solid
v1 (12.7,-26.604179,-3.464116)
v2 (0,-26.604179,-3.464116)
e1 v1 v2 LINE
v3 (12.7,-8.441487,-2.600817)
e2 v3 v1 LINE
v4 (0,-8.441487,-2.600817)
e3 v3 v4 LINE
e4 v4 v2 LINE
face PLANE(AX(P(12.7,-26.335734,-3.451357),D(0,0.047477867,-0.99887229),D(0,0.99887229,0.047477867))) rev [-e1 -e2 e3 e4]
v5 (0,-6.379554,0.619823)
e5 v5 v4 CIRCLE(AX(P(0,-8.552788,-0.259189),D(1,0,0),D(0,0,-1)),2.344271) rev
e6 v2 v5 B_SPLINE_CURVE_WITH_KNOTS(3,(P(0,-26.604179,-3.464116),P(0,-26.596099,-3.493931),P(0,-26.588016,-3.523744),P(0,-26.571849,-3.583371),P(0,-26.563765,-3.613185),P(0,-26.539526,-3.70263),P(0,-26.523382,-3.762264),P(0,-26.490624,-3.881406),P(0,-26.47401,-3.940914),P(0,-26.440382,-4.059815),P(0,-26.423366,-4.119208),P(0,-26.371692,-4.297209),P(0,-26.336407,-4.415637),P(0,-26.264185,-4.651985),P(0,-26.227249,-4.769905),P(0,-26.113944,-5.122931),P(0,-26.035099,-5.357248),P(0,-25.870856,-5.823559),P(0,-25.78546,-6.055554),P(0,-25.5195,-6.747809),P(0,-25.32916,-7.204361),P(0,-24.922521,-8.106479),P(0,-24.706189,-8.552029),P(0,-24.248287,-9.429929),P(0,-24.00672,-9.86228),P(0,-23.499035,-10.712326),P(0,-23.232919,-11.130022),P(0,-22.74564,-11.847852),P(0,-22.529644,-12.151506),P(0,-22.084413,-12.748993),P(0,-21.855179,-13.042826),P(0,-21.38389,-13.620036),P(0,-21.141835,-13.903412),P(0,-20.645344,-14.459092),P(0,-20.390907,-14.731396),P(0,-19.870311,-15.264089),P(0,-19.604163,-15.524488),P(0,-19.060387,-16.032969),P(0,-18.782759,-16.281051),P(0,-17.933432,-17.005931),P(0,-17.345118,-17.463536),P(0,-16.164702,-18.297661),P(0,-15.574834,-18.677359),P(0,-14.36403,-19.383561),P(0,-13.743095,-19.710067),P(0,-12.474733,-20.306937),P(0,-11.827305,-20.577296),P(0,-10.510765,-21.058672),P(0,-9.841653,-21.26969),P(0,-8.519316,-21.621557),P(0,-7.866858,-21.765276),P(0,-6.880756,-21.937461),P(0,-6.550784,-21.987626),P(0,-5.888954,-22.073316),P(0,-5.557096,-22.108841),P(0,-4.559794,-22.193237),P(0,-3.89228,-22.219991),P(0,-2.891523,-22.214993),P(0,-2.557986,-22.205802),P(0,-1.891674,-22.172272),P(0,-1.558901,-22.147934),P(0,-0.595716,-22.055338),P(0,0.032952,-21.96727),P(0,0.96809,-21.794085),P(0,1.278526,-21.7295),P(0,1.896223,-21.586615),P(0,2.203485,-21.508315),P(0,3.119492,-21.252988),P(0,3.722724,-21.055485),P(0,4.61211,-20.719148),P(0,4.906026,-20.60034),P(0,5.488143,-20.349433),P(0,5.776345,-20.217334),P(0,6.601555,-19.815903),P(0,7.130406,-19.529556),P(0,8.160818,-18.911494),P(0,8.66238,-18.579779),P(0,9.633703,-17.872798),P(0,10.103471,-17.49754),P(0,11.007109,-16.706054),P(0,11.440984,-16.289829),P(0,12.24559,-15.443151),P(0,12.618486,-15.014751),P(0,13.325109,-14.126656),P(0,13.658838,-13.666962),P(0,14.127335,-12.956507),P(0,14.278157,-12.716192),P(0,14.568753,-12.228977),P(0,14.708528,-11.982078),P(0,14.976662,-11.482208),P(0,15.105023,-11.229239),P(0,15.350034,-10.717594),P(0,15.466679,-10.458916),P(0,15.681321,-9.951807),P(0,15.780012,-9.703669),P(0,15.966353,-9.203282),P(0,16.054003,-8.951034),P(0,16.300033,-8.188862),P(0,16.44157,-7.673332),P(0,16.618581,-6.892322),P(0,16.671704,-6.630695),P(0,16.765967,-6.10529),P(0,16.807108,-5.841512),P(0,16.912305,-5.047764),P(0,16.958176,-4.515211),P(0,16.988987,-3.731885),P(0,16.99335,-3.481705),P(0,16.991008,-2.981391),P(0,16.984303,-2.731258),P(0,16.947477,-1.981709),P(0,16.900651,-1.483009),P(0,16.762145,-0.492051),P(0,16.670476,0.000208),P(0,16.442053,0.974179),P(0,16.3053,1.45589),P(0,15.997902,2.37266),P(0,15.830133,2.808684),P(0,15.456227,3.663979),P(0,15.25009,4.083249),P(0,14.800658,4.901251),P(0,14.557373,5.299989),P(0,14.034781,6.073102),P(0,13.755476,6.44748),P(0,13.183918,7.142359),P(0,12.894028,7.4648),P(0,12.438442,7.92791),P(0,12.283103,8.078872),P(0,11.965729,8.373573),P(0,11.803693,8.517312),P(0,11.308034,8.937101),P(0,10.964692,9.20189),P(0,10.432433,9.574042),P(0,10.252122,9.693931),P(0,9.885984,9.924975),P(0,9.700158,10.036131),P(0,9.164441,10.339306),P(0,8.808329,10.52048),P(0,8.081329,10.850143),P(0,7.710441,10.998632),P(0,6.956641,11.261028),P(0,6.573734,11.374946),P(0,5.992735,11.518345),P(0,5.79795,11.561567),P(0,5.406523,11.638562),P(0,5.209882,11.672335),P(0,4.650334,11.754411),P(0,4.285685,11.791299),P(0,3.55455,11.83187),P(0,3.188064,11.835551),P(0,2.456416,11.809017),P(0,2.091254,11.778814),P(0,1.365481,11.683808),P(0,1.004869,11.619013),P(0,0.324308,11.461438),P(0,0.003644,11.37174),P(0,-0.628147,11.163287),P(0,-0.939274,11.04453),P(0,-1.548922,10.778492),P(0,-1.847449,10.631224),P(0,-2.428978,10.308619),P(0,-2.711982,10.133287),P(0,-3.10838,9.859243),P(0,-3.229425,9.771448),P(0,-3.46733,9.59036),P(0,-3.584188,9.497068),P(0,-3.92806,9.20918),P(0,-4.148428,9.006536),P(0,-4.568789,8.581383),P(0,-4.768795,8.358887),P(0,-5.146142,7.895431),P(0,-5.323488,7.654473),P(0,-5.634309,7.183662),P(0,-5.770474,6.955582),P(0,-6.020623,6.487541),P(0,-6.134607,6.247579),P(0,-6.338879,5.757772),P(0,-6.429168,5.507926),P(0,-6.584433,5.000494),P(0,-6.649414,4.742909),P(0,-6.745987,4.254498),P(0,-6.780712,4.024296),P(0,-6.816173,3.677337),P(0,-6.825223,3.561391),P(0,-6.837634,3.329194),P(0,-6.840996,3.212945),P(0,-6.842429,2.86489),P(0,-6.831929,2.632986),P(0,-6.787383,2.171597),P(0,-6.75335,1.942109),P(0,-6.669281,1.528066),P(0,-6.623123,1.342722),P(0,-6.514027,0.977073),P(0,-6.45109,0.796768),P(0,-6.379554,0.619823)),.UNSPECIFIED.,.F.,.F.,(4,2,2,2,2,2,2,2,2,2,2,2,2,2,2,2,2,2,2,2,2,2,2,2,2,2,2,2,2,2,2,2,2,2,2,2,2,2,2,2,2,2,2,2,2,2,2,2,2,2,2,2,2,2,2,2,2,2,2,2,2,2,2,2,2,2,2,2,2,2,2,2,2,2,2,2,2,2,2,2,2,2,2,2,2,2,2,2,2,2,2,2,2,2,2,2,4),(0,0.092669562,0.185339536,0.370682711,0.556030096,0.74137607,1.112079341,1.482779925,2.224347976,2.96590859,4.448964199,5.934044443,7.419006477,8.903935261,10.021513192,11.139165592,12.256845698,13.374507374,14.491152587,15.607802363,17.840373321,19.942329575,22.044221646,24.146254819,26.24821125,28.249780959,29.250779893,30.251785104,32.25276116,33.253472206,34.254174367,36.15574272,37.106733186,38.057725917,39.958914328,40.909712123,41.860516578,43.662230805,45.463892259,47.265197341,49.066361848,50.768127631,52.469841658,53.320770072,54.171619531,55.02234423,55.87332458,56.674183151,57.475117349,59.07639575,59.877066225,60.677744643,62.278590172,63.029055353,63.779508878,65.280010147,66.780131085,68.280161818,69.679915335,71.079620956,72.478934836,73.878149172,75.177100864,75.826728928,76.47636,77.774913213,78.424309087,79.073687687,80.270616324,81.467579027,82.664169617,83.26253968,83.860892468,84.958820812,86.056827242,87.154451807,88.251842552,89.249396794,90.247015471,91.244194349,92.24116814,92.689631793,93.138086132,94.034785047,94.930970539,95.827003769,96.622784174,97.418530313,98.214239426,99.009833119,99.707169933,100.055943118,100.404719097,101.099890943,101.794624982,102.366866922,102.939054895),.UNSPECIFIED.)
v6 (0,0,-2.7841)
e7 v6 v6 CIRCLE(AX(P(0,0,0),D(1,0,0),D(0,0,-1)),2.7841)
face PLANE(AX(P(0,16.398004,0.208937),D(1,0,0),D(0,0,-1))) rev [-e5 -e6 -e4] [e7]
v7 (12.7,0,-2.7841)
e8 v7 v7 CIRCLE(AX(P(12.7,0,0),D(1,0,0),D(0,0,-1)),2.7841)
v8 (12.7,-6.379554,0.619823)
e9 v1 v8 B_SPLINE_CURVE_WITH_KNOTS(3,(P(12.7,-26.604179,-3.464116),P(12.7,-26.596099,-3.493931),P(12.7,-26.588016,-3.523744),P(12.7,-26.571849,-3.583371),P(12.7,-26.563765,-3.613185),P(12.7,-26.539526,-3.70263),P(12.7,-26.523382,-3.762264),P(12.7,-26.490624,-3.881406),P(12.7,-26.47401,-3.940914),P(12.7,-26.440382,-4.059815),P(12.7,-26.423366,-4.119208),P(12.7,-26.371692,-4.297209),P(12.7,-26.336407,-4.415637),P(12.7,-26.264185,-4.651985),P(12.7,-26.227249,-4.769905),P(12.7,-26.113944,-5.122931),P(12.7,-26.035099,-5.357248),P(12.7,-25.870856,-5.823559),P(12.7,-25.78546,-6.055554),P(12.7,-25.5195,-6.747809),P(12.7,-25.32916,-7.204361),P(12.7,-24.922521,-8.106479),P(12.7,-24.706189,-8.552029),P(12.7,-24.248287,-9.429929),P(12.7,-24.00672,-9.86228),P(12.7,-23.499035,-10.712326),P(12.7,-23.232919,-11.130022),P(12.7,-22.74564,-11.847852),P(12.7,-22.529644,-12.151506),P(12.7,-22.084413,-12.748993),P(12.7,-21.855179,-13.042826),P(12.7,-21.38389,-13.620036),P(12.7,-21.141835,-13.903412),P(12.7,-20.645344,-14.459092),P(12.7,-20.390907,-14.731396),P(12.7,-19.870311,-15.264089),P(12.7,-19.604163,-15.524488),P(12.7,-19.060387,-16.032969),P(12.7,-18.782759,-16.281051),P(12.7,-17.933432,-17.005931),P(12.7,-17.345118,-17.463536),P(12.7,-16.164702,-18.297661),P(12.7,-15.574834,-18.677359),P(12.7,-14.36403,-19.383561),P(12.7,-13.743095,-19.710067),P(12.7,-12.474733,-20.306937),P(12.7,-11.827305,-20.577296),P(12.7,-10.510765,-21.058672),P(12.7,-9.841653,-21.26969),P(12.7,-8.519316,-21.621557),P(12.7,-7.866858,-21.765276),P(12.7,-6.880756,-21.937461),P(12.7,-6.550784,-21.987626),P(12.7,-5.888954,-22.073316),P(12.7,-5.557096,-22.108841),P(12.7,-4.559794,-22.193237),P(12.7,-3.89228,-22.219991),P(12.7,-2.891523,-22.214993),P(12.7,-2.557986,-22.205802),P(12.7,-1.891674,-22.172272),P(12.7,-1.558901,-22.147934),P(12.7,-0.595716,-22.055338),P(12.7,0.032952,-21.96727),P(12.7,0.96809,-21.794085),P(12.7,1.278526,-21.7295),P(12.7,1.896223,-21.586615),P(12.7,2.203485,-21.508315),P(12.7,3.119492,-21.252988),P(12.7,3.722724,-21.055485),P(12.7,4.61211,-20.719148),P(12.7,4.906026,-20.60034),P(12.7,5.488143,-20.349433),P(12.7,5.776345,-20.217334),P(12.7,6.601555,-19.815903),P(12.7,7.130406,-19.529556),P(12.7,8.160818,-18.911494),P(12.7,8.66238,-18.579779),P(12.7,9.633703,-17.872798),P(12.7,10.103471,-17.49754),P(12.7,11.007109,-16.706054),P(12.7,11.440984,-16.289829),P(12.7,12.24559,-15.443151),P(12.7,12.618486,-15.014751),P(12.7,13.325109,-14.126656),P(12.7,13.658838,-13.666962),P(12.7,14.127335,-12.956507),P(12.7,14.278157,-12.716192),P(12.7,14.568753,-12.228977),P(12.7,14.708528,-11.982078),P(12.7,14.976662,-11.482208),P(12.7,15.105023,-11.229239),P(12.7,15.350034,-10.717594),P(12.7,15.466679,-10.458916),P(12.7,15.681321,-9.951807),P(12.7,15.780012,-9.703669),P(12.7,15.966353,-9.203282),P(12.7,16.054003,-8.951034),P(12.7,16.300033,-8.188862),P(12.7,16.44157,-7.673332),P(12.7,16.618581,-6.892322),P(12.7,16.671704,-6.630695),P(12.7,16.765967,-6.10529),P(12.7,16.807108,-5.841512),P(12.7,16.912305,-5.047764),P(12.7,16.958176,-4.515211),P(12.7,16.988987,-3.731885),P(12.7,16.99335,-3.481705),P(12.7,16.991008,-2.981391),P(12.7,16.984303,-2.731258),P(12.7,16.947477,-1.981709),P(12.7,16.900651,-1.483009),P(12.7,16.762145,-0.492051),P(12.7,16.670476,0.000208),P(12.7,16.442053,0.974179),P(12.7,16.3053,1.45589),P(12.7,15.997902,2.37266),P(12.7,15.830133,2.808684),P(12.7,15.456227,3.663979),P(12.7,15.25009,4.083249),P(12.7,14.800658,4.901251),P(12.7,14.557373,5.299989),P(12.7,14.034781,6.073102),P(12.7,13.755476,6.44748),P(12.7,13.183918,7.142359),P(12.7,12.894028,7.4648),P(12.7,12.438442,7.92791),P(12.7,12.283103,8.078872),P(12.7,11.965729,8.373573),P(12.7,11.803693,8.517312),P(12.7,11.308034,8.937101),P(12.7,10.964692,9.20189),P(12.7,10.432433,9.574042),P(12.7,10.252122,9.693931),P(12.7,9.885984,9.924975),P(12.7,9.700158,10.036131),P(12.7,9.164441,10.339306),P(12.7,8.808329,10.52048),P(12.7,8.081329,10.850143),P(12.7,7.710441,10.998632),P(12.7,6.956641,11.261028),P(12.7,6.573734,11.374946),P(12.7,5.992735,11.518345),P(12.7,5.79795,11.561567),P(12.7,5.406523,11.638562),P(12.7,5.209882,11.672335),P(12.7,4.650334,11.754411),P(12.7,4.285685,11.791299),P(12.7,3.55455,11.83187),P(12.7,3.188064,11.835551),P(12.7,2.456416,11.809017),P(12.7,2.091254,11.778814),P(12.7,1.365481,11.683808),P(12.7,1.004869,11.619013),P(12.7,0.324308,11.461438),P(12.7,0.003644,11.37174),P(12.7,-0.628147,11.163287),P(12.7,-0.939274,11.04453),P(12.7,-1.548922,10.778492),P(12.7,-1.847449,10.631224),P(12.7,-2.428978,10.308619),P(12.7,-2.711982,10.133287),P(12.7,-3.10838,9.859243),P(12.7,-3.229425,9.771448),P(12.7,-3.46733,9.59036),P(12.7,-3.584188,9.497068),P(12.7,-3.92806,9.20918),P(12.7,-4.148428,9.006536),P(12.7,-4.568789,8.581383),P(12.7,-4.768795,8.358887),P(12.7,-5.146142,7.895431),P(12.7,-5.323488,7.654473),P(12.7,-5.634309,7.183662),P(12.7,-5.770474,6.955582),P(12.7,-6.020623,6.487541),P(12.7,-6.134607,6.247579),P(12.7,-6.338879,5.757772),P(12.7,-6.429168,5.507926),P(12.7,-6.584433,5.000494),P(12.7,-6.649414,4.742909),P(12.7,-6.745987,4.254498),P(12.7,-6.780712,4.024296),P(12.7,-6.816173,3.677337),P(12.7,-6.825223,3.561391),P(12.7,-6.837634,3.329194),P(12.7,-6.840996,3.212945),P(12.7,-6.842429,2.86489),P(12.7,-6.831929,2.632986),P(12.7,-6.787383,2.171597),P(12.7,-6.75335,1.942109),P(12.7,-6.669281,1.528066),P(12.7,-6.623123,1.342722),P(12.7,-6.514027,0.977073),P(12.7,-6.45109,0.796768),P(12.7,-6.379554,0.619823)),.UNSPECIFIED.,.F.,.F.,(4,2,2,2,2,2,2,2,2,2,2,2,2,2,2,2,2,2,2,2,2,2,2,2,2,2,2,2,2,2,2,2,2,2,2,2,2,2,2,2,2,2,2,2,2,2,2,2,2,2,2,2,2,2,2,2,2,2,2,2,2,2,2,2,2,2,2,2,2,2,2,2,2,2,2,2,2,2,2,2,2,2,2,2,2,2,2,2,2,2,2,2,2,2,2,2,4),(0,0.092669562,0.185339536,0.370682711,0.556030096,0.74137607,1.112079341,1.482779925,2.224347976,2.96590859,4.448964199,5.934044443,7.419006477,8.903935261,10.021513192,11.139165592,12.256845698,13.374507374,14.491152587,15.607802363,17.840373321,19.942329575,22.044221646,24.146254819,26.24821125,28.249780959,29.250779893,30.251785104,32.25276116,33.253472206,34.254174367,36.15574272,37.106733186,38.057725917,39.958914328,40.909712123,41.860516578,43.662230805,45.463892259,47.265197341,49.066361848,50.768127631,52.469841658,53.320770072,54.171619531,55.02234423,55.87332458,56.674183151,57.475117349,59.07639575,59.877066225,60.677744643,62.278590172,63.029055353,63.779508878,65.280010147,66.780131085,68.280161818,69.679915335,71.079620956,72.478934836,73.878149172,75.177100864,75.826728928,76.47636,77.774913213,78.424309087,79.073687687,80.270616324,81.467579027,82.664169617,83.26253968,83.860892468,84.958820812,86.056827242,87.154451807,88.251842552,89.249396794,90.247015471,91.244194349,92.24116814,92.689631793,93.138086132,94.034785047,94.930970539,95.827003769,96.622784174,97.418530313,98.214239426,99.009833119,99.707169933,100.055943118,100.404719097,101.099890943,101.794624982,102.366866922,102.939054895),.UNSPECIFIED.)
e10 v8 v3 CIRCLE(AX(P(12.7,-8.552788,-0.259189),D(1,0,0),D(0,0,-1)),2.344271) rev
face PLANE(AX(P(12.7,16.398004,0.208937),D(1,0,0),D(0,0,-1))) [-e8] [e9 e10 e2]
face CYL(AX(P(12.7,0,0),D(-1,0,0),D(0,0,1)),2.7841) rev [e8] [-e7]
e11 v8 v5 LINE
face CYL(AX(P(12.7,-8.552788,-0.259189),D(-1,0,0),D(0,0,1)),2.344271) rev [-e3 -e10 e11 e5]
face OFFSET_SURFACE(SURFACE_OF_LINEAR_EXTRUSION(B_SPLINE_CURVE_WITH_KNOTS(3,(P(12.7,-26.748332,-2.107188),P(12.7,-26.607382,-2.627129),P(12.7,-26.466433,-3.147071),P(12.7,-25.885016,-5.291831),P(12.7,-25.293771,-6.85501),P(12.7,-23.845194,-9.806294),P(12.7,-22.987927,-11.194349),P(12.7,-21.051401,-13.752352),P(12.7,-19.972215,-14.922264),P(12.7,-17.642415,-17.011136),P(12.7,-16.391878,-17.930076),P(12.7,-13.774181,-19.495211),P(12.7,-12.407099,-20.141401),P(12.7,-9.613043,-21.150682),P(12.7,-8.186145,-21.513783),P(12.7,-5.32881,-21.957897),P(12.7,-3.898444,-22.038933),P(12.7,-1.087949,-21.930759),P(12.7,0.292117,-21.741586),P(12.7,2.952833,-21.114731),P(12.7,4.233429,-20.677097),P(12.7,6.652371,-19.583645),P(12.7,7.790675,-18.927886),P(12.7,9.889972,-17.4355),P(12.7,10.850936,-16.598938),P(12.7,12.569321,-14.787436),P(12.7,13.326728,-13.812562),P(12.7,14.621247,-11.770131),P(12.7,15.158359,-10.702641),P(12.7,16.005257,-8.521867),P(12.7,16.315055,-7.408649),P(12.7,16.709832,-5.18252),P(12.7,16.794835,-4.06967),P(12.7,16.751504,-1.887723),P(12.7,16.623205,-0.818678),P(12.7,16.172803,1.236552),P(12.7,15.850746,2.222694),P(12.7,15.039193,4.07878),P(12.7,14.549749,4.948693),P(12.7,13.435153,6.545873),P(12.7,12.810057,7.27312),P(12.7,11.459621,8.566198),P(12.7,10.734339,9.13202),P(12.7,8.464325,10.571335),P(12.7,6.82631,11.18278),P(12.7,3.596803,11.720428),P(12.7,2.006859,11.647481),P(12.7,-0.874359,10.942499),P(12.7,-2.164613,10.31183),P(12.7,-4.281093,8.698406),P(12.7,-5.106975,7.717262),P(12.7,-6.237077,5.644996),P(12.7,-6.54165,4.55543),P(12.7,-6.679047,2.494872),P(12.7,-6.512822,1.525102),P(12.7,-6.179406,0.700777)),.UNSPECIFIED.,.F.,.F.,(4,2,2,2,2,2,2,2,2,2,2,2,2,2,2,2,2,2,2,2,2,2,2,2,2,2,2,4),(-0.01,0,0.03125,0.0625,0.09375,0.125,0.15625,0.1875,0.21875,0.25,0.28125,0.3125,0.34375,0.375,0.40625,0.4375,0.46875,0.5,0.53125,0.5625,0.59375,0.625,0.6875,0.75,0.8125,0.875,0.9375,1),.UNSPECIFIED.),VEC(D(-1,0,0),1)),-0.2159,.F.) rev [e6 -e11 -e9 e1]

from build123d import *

# Parameters (mm, degrees)
SKETCH4_R              = 3
BOSS_EXTRUDE1_DEPTH    = 12.7
MOVE_FACE1_OUTLINE_R   = 3
MOVE_FACE1_OUTLINE_R_2 = 2.7841
MOVE_FACE1_DEPTH       = 12.7


# Read off the part's stored shape, not the designer's step: Move Face1
with BuildPart() as part:
    # Sketch4 → Boss-Extrude1 (new body)
    with BuildSketch(Plane(origin=(0, 0, 0), x_dir=(0, 0, -1), z_dir=(1, 0, 0))):
        with BuildLine():
            Line((3.667013126, -26.3254835), (2.816473307, -8.431236894))
            ThreePointArc((2.816473307, -8.431236894), (1.639602622, -6.396649217), (-0.700777066, -6.179406175))
            add(Edge.make_bspline(
                [(-0.700777066, -6.179406175), (-1.525102008, -6.512822326), (-2.494871997, -6.679047096), (-4.555429578, -6.54165034), (-5.644996058, -6.237076936), (-7.717261628, -5.106975392), (-8.698405735, -4.281093265), (-10.311829803, -2.164612563), (-10.942499326, -0.874358563), (-11.647480976, 2.006859472), (-11.720427957, 3.596803483), (-11.182779689, 6.826310345), (-10.571334953, 8.46432492), (-9.132019695, 10.73433891), (-8.566197708, 11.459621106), (-7.273120414, 12.810057002), (-6.545872807, 13.435152517), (-4.948692799, 14.549748502), (-4.078780417, 15.039192621), (-2.22269385, 15.85074605), (-1.236551533, 16.172803424), (0.818678144, 16.623204755), (1.887722789, 16.751503646), (4.069669804, 16.79483508), (5.182520117, 16.709831654), (7.408648574, 16.315055224), (8.521867273, 16.00525724), (10.70264063, 15.158359498), (11.770130786, 14.621247223), (13.812561896, 13.326727542), (14.787435905, 12.56932106), (16.598938448, 10.850935673), (17.435500393, 9.889971566), (18.927885533, 7.790674993), (19.583645356, 6.652371052), (20.677096627, 4.233429246), (21.114730733, 2.952832896), (21.741586229, 0.292117033), (21.930758945, -1.087949282), (22.038932986, -3.898444365), (21.957896657, -5.328810088), (21.513783431, -8.186144708), (21.150681858, -9.613043017), (20.141400668, -12.407098951), (19.49521083, -13.774181132), (17.930076055, -16.391877744), (17.011136269, -17.642414844), (14.922264044, -19.972214517), (13.752352434, -21.051401006), (11.194349378, -22.98792657), (9.80629411, -23.845193985), (6.855009859, -25.29377098), (5.291831431, -25.88501641), (3.667013126, -26.3254835)],
                knots=[0, 0, 0, 0, 0.0625, 0.0625, 0.125, 0.125, 0.1875, 0.1875, 0.25, 0.25, 0.3125, 0.3125, 0.375, 0.375, 0.40625, 0.40625, 0.4375, 0.4375, 0.46875, 0.46875, 0.5, 0.5, 0.53125, 0.53125, 0.5625, 0.5625, 0.59375, 0.59375, 0.625, 0.625, 0.65625, 0.65625, 0.6875, 0.6875, 0.71875, 0.71875, 0.75, 0.75, 0.78125, 0.78125, 0.8125, 0.8125, 0.84375, 0.84375, 0.875, 0.875, 0.90625, 0.90625, 0.9375, 0.9375, 0.96875, 0.96875, 1, 1, 1, 1], degree=3))
        make_face()
        Circle(SKETCH4_R, mode=Mode.SUBTRACT)
    extrude(amount=BOSS_EXTRUDE1_DEPTH)

    # Move Face1 outline → Move Face1 (add)
    # profile 1 of 2: a face of its own
    with BuildSketch(Plane.YZ):
        with BuildLine():
            Line((-8.441487365, -2.600816779), (-26.604178645, -3.464116168))
            add(Edge.make_bspline(
                [(-26.604178645, -3.464116168), (-26.599569003, -3.481120458), (-26.594959362, -3.498124748), (-26.59034972, -3.515129038), (-26.585740078, -3.532133328), (-26.581130437, -3.549137618), (-26.576520795, -3.566141908), (-26.571911153, -3.583146198), (-26.567301512, -3.600150488), (-26.56269187, -3.617154778), (-26.558082228, -3.634159068), (-26.553472587, -3.651163358), (-26.548862945, -3.668167648), (-26.544253303, -3.685171938), (-26.53927128, -3.703549889), (-26.538898899, -3.704923549), (-26.538526517, -3.70629721), (-26.538154136, -3.707670871), (-26.537781754, -3.709044531), (-26.537409373, -3.710418192), (-26.537036991, -3.711791852), (-26.53666461, -3.713165513), (-26.536292228, -3.714539173), (-26.535919847, -3.715912834), (-26.535547465, -3.717286495), (-26.535175084, -3.718660155), (-26.534802702, -3.720033816), (-26.53424413, -3.722094307), (-26.534059907, -3.722773916), (-26.533858021, -3.723518442), (-26.533727067, -3.724001851), (-26.533440048, -3.725060798), (-26.533340537, -3.725426825), (-26.533133021, -3.726192717), (-26.532893488, -3.727076218), (-26.532782162, -3.727485594), (-26.532537582, -3.728388165), (-26.532375797, -3.728983938), (-26.532180677, -3.729703197), (-26.531993743, -3.730392017), (-26.531617908, -3.731776793), (-26.531429971, -3.732469173), (-26.531242014, -3.733161545), (-26.531054038, -3.733853909), (-26.530866042, -3.734546265), (-26.530678027, -3.735238614), (-26.530489992, -3.735930954), (-26.530301938, -3.736623286), (-26.530113864, -3.73731561), (-26.529925771, -3.738007927), (-26.529737659, -3.738700235), (-26.529549527, -3.739392535), (-26.529361375, -3.740084828), (-26.528420519, -3.74354625), (-26.527667523, -3.74631526), (-26.526914215, -3.749084142), (-26.526160594, -3.751852897), (-26.525406663, -3.754621524), (-26.524652417, -3.757390023), (-26.523897864, -3.760158394), (-26.523142994, -3.762926638), (-26.522387816, -3.765694753), (-26.521632324, -3.768462741), (-26.520876522, -3.7712306), (-26.520120408, -3.773998332), (-26.519363982, -3.776765936), (-26.517093769, -3.785068362), (-26.515579047, -3.790602801), (-26.514063078, -3.796136728), (-26.512545864, -3.801670141), (-26.511027403, -3.807203041), (-26.509507697, -3.812735429), (-26.507986745, -3.818267302), (-26.506464548, -3.823798661), (-26.504941106, -3.829329506), (-26.503416418, -3.834859837), (-26.501890486, -3.840389653), (-26.500363309, -3.845918954), (-26.498834888, -3.85144774), (-26.494245891, -3.868032549), (-26.491181583, -3.879087027), (-26.488112299, -3.890139439), (-26.485038042, -3.901189785), (-26.481958812, -3.912238061), (-26.478874612, -3.923284266), (-26.475785441, -3.934328398), (-26.472691304, -3.945370453), (-26.4695922, -3.956410431), (-26.466488131, -3.967448328), (-26.463379099, -3.978484142), (-26.460265106, -3.989517871), (-26.457146153, -4.000549514), (-26.441526593, -4.055697279), (-26.428951609, -4.099782062), (-26.416297387, -4.143833272), (-26.403564026, -4.187850766), (-26.390751622, -4.2318344), (-26.377860278, -4.275784033), (-26.364890086, -4.31969952), (-26.351841151, -4.363580717), (-26.338713566, -4.407427483), (-26.325507433, -4.451239673), (-26.312222848, -4.495017144), (-26.298859911, -4.538759754), (-26.285418719, -4.582467358), (-26.217821979, -4.800829638), (-26.162494118, -4.974957082), (-26.105922065, -5.148512984), (-26.048112096, -5.321488181), (-25.989070491, -5.49387351), (-25.928803524, -5.665659807), (-25.867317478, -5.836837911), (-25.804618624, -6.007398657), (-25.740713246, -6.177332884), (-25.675607616, -6.346631428), (-25.609308015, -6.515285126), (-25.541820718, -6.683284815), (-25.473152005, -6.850621333), (-25.263620445, -7.350613883), (-25.119234857, -7.681244245), (-24.970181526, -8.009184855), (-24.816563128, -8.334008567), (-24.658405438, -8.656540908), (-24.495574442, -8.975326705), (-24.328540305, -9.291435032), (-24.157090549, -9.604622916), (-23.981161893, -9.914157206), (-23.801250109, -10.220890306), (-23.616969066, -10.524098117), (-23.428657045, -10.824036045), (-23.23626742, -11.120542818), (-22.843508974, -11.706612059), (-22.643142176, -11.996174333), (-22.438808393, -12.282198027), (-22.230723583, -12.56460565), (-22.018648797, -12.843459923), (-21.802917467, -13.118447754), (-21.583605212, -13.389644606), (-21.360601243, -13.657176078), (-21.134077845, -13.920797741), (-20.904199437, -14.180403567), (-20.670850853, -14.43621903), (-20.434249131, -14.687936687), (-20.194399706, -14.935644556), (-19.70838235, -15.42287054), (-19.462215458, -15.662397811), (-19.212931723, -15.897766285), (-18.960728671, -16.128991264), (-18.70539447, -16.355994955), (-18.447304202, -16.578625492), (-18.186499944, -16.796967202), (-17.922857209, -17.011060359), (-17.656599224, -17.220738444), (-17.387896766, -17.42596103), (-17.116588056, -17.626860373), (-16.842954408, -17.82323191), (-16.566974945, -18.015139117), (-16.010532784, -18.389907039), (-15.730066911, -18.572777232), (-15.447424653, -18.751061226), (-15.162746667, -18.924851219), (-14.875916093, -19.093949929), (-14.587276398, -19.258367365), (-14.296840097, -19.418183126), (-14.004513923, -19.573354608), (-13.710535007, -19.723805382), (-13.415054471, -19.869556513), (-13.117916757, -20.010637113), (-12.819417073, -20.146961011), (-12.519527346, -20.278558541), (-11.917189037, -20.532242336), (-11.614733643, -20.65433651), (-11.311086848, -20.771622769), (-11.006314451, -20.884236095), (-10.700430715, -20.991914806), (-10.39369458, -21.094796517), (-10.086097937, -21.192946197), (-9.777608438, -21.286263743), (-9.468444303, -21.374756831), (-9.158720169, -21.458492374), (-8.848328151, -21.537414262), (-8.537533287, -21.611545146), (-8.226317575, -21.68088471), (-7.603260387, -21.809981168), (-7.291409675, -21.869743076), (-6.979352707, -21.924681004), (-6.667077965, -21.974937355), (-6.354741362, -22.020247701), (-6.042483137, -22.060828702), (-5.730286129, -22.096726163), (-5.418195248, -22.127815836), (-5.10638259, -22.154172495), (-4.794917194, -22.175889882), (-4.483768614, -22.19285834), (-4.173135796, -22.205184806), (-3.863025065, -22.212847752), (-3.244042, -22.218898546), (-2.935160635, -22.217283683), (-2.627009812, -22.211051294), (-2.319535889, -22.200221076), (-2.012978585, -22.184764162), (-1.707390049, -22.164745089), (-1.402745405, -22.140231054), (-1.099140461, -22.111224435), (-0.796711927, -22.077727229), (-0.495491172, -22.03980106), (-0.195495425, -21.997498698), (0.103120125, -21.950796576), (0.400341286, -21.899765548), (0.991819558, -21.789077387), (1.28608355, -21.729419077), (1.578768432, -21.665496674), (1.869917455, -21.597302553), (2.159298453, -21.524877058), (2.446882891, -21.44828864), (2.732707168, -21.367584679), (3.016672969, -21.282790594), (3.298648908, -21.193943649), (3.578623787, -21.101102717), (3.85659217, -21.004314712), (4.132391722, -20.903599993), (4.406031128, -20.799020335), (4.948821205, -20.582201458), (5.217977174, -20.469959264), (5.484813738, -20.353954278), (5.749350964, -20.234161295), (6.01138819, -20.110681465), (6.270917632, -19.983580155), (6.527976619, -19.852885482), (6.782472092, -19.718646938), (7.034289441, -19.580933449), (7.283432367, -19.43979613), (7.529901875, -19.295274808), (7.77354503, -19.147434253), (8.014385292, -18.996321733), (8.490309508, -18.687660003), (8.725396651, -18.530106846), (8.957555599, -18.369412167), (9.186776625, -18.205547192), (9.412909718, -18.038656901), (9.635962414, -17.868799381), (9.855964095, -17.695988596), (10.072835585, -17.520295455), (10.286488685, -17.341812823), (10.496935081, -17.160582706), (10.704177349, -16.976639307), (10.908088748, -16.790084702), (11.108697582, -16.60095136), (11.503188846, -16.217665056), (11.697072069, -16.023508272), (11.887567215, -15.826919792), (12.074634411, -15.627883555), (12.258185431, -15.42656542), (12.438237852, -15.223014525), (12.614807781, -15.017239038), (12.787836646, -14.809325702), (12.957268738, -14.599380603), (13.123118176, -14.387438261), (13.285386007, -14.173530705), (13.443983714, -13.9577844), (13.598936774, -13.740220791), (13.901469825, -13.301617581), (14.049048428, -13.080575457), (14.192938252, -12.85786673), (14.333075884, -12.633504041), (14.469436513, -12.407648424), (14.602043246, -12.180340569), (14.730898025, -11.951592848), (14.855967044, -11.721500116), (14.977228845, -11.490169384), (15.094696526, -11.257631481), (15.208368824, -11.023920803), (15.318201343, -10.789171515), (15.424212302, -10.553400689), (15.62854924, -10.079983096), (15.726872378, -9.842336108), (15.821368333, -9.603809457), (15.911963677, -9.364456828), (15.998688398, -9.124410274), (16.081568069, -8.883704025), (16.160594519, -8.642364015), (16.235759672, -8.400484565), (16.307073362, -8.15816166), (16.374546973, -7.915427103), (16.438178826, -7.672322007), (16.497967314, -7.428970727), (16.553923089, -7.185393613), (16.658169192, -6.697950384), (16.706458163, -6.454088263), (16.750931294, -6.210116308), (16.791551227, -5.966156004), (16.828352164, -5.722265003), (16.861371473, -5.478483856), (16.89061727, -5.234873215), (16.916091026, -4.991505669), (16.937812625, -4.748444975), (16.955811803, -4.505744551), (16.970101403, -4.263463823), (16.98068149, -4.021672476), (16.987586075, -3.780425869), (16.994060031, -3.299148156), (16.993631026, -3.059123221), (16.989555385, -2.819737011), (16.981828074, -2.581119041), (16.97049256, -2.343310945), (16.955590155, -2.106340667), (16.937140606, -1.870268338), (16.91516095, -1.635166239), (16.889682937, -1.401088709), (16.860744509, -1.168076804), (16.828369507, -0.936186685), (16.792572797, -0.705489655), (16.753396921, -0.476025059), (16.668327332, -0.019684131), (16.622436928, 0.207187985), (16.573210516, 0.43274012), (16.520676595, 0.656845924), (16.464882551, 0.879479604), (16.405870334, 1.100624284), (16.3436718, 1.320223268), (16.278319602, 1.538208936), (16.209854217, 1.754538123), (16.138317988, 1.969182142), (16.063745228, 2.182090339), (15.986166539, 2.393194111), (15.905627626, 2.602469813), (15.738694717, 3.017250287), (15.652304686, 3.222753348), (15.563011722, 3.426348397), (15.470874943, 3.627923175), (15.375941264, 3.827466031), (15.27825116, 4.024968988), (15.177848129, 4.22038201), (15.074779017, 4.413646484), (14.969089842, 4.604731213), (14.860824208, 4.793618869), (14.750025822, 4.980266585), (14.6367404, 5.164613119), (14.521012434, 5.346648599), (14.284759964, 5.705997611), (14.164238936, 5.88331198), (14.041346931, 6.058244698), (13.916166576, 6.230707349), (13.788741729, 6.400699169), (13.659110682, 6.568218603), (13.527326668, 6.733225876), (13.393447683, 6.895675454), (13.257522548, 7.055547765), (13.11959423, 7.212834846), (12.979713874, 7.367503996), (12.837939646, 7.519506253), (12.694312503, 7.668841812), (12.403459758, 7.962101433), (12.256236093, 8.106028416), (12.107245062, 8.247230378), (11.956582639, 8.385649016), (11.804288588, 8.521291455), (11.65039943, 8.654160681), (11.494975113, 8.78422985), (11.338080513, 8.911469301), (11.179764974, 9.035870418), (11.020069941, 9.157432821), (10.859051406, 9.276135657), (10.696775757, 9.391945779), (10.53327979, 9.504870215), (10.348041361, 9.62863484), (10.327440973, 9.642341074), (10.306822731, 9.656001739), (10.286186731, 9.669616814), (10.265532905, 9.683186339), (10.244861188, 9.696710349), (10.224171615, 9.710188832), (10.203464367, 9.723621723), (10.182739741, 9.737008906), (10.161998068, 9.750350261), (10.141239561, 9.763645725), (10.12046411, 9.776895389), (10.099671, 9.79009961), (10.058046161, 9.81641871), (10.037217098, 9.829531834), (10.016371494, 9.842598537), (9.995509453, 9.855618821), (9.974631077, 9.868592692), (9.953736471, 9.881520152), (9.932825737, 9.894401206), (9.911898978, 9.907235857), (9.890956298, 9.920024109), (9.869997801, 9.932765967), (9.849023589, 9.945461434), (9.828033765, 9.958110514), (9.807028434, 9.97071321), (9.743966224, 10.00838216), (9.701863133, 10.033309276), (9.659699249, 10.058050905), (9.617475395, 10.082607077), (9.575192397, 10.106977826), (9.532851077, 10.131163181), (9.490452261, 10.155163174), (9.447996771, 10.178977836), (9.405485434, 10.202607198), (9.362919072, 10.226051291), (9.320298511, 10.249310147), (9.277624573, 10.272383796), (9.234898083, 10.29527227), (9.106563432, 10.363382261), (9.020800116, 10.408048353), (8.934836483, 10.451974125), (8.848679096, 10.495159823), (8.762334519, 10.537605698), (8.675809318, 10.579311995), (8.589110055, 10.620278965), (8.502243296, 10.660506853), (8.415215603, 10.699995909), (8.328033542, 10.73874638), (8.240703676, 10.776758515), (8.15323257, 10.814032561), (8.065626787, 10.850568766), (7.802425101, 10.957964605), (7.626444742, 11.026611369), (7.450004147, 11.092309662), (7.27315561, 11.155061426), (7.095951384, 11.214868552), (6.918443686, 11.271732888), (6.740684687, 11.325656229), (6.562726523, 11.376640328), (6.384621288, 11.424686885), (6.206421038, 11.469797554), (6.028177787, 11.511973941), (5.84994351, 11.551217606), (5.671770144, 11.587530057), (5.315649022, 11.654295458), (5.137728602, 11.684747226), (4.959700016, 11.712299475), (4.783019884, 11.736712222), (4.604276011, 11.758891306), (4.429464411, 11.777036031), (4.250811556, 11.793890793), (4.076436597, 11.806370641), (3.899761626, 11.817263639), (3.725133165, 11.824666119), (3.550410334, 11.829638498), (3.37648165, 11.831780195), (3.203155326, 11.831236863), (2.857881444, 11.824777298), (2.685930065, 11.818863209), (2.51470827, 11.810286856), (2.344260063, 11.799070213), (2.174629427, 11.785235191), (2.005860324, 11.768803637), (1.837996698, 11.749797331), (1.671082472, 11.728237989), (1.50516155, 11.704147262), (1.340277816, 11.677546737), (1.176475132, 11.648457935), (1.013797343, 11.616902313), (0.852288272, 11.582901263), (0.61184345, 11.528263534), (0.53200571, 11.509447542), (0.452431498, 11.490014724), (0.373262519, 11.470000825), (0.294382178, 11.449393041), (0.215797381, 11.428191413), (0.137577788, 11.406409742), (0.059709652, 11.384053465), (-0.017850954, 11.361120913), (-0.095072103, 11.33761765), (-0.171912733, 11.313553202), (-0.248433789, 11.288926884), (-0.324588602, 11.263745774), (-0.476187787, 11.21228181), (-0.551629997, 11.185999058), (-0.626711201, 11.159170067), (-0.701427774, 11.131799368), (-0.775776089, 11.103891494), (-0.849752523, 11.075450975), (-0.92335345, 11.046482344), (-0.996575245, 11.016990131), (-1.069414282, 10.986978867), (-1.141866938, 10.956453085), (-1.213929586, 10.925417316), (-1.285598602, 10.89387609), (-1.35687036, 10.86183394), (-1.569482988, 10.764218312), (-1.709621229, 10.697155476), (-1.848127108, 10.628143005), (-1.98497177, 10.557216936), (-2.120126347, 10.484413233), (-2.253561967, 10.409767786), (-2.385249746, 10.333316406), (-2.515160795, 10.255094835), (-2.643266216, 10.175138734), (-2.769537102, 10.093483694), (-2.893944539, 10.010165228), (-3.016459604, 9.925218776), (-3.137053367, 9.838679702), (-3.315018649, 9.706535092), (-3.373849905, 9.662101445), (-3.432225085, 9.617246491), (-3.489973308, 9.572127532), (-3.547384771, 9.52651408), (-3.604222119, 9.480589049), (-3.660493818, 9.43435795), (-3.716362737, 9.387700649), (-3.771715305, 9.340702599), (-3.826473613, 9.293429538), (-3.880830859, 9.245743042), (-3.934616774, 9.197770987), (-3.987913252, 9.149459099), (-4.093478067, 9.052199488), (-4.145749357, 9.003249721), (-4.19750826, 8.953985292), (-4.248753506, 8.904411497), (-4.299483825, 8.854533635), (-4.349697947, 8.804357003), (-4.399394603, 8.753886901), (-4.448572522, 8.703128624), (-4.497230434, 8.652087473), (-4.545367069, 8.600768744), (-4.592981158, 8.549177736), (-4.640071431, 8.497319746), (-4.686636617, 8.445200073), (-4.824753105, 8.288071896), (-4.914725275, 8.182294046), (-5.002581891, 8.075532644), (-5.088312844, 7.967829797), (-5.171907984, 7.859227538), (-5.253357116, 7.749767825), (-5.332650002, 7.639492543), (-5.409776362, 7.528443501), (-5.48472587, 7.416662437), (-5.55748816, 7.304191013), (-5.628052821, 7.191070818), (-5.696409398, 7.077343365), (-5.762547394, 6.963050096), (-5.890365144, 6.733414655), (-5.952053709, 6.61804774), (-6.011379226, 6.5024593), (-6.068789532, 6.385932229), (-6.123482319, 6.2698429), (-6.176476599, 6.152615371), (-6.226996856, 6.035513752), (-6.275228474, 5.918322644), (-6.321621575, 5.800380212), (-6.365473581, 5.682832438), (-6.407390636, 5.564799764), (-6.447052072, 5.446825396), (-6.484587524, 5.328765169), (-6.55536853, 5.092635858), (-6.588616961, 4.974562342), (-6.619731944, 4.856519728), (-6.64872202, 4.73854772), (-6.675595644, 4.620685966), (-6.700361191, 4.50297406), (-6.723026952, 4.385451536), (-6.743601132, 4.268157874), (-6.762091856, 4.151132495), (-6.778507164, 4.034414767), (-6.792855012, 3.918043998), (-6.805143275, 3.802059442), (-6.815379741, 3.686500296), (-6.839956872, 3.341216503), (-6.848154204, 3.113073347), (-6.848438469, 2.887099769), (-6.84084938, 2.663718746), (-6.825763132, 2.443005573), (-6.803253008, 2.225285636), (-6.773501282, 2.01082461), (-6.73678547, 1.799796855), (-6.69324338, 1.592468222), (-6.643018498, 1.389115017), (-6.586393416, 1.18991247), (-6.52346955, 0.995146747), (-6.454467342, 0.805035191), (-6.379554183, 0.619822851)],
                knots=[-0.001662915, -0.001662915, -0.001662915, -0.001662915, -0.001662915, -0.001662915, -0.001662915, -0.001662915, -0.001662915, -0.001662915, -0.001662915, -0.001662915, -0.001662915, -0.001662915, -0.001662915, -0.000136719, -0.000136719, -0.000136719, -0.000136719, -0.000136719, -0.000136719, -0.000136719, -0.000136719, -0.000136719, -0.000136719, -0.000136719, -0.000136719, -0.000136719, -1.3428e-05, -1.3428e-05, -1.3428e-05, -1.3428e-05, -1.3428e-05, -1.3428e-05, -1.3428e-05, -1.3428e-05, -1.3428e-05, -1.3428e-05, -1.3428e-05, -1.3428e-05, -1.3428e-05, 4.8218e-05, 4.8218e-05, 4.8218e-05, 4.8218e-05, 4.8218e-05, 4.8218e-05, 4.8218e-05, 4.8218e-05, 4.8218e-05, 4.8218e-05, 4.8218e-05, 4.8218e-05, 4.8218e-05, 0.000109863, 0.000109863, 0.000109863, 0.000109863, 0.000109863, 0.000109863, 0.000109863, 0.000109863, 0.000109863, 0.000109863, 0.000109863, 0.000109863, 0.000109863, 0.000356445, 0.000356445, 0.000356445, 0.000356445, 0.000356445, 0.000356445, 0.000356445, 0.000356445, 0.000356445, 0.000356445, 0.000356445, 0.000356445, 0.000356445, 0.000849609, 0.000849609, 0.000849609, 0.000849609, 0.000849609, 0.000849609, 0.000849609, 0.000849609, 0.000849609, 0.000849609, 0.000849609, 0.000849609, 0.000849609, 0.001835937, 0.001835937, 0.001835937, 0.001835937, 0.001835937, 0.001835937, 0.001835937, 0.001835937, 0.001835937, 0.001835937, 0.001835937, 0.001835937, 0.001835937, 0.00578125, 0.00578125, 0.00578125, 0.00578125, 0.00578125, 0.00578125, 0.00578125, 0.00578125, 0.00578125, 0.00578125, 0.00578125, 0.00578125, 0.00578125, 0.0215625, 0.0215625, 0.0215625, 0.0215625, 0.0215625, 0.0215625, 0.0215625, 0.0215625, 0.0215625, 0.0215625, 0.0215625, 0.0215625, 0.0215625, 0.053125, 0.053125, 0.053125, 0.053125, 0.053125, 0.053125, 0.053125, 0.053125, 0.053125, 0.053125, 0.053125, 0.053125, 0.053125, 0.0846875, 0.0846875, 0.0846875, 0.0846875, 0.0846875, 0.0846875, 0.0846875, 0.0846875, 0.0846875, 0.0846875, 0.0846875, 0.0846875, 0.0846875, 0.11625, 0.11625, 0.11625, 0.11625, 0.11625, 0.11625, 0.11625, 0.11625, 0.11625, 0.11625, 0.11625, 0.11625, 0.11625, 0.1478125, 0.1478125, 0.1478125, 0.1478125, 0.1478125, 0.1478125, 0.1478125, 0.1478125, 0.1478125, 0.1478125, 0.1478125, 0.1478125, 0.1478125, 0.179375, 0.179375, 0.179375, 0.179375, 0.179375, 0.179375, 0.179375, 0.179375, 0.179375, 0.179375, 0.179375, 0.179375, 0.179375, 0.2109375, 0.2109375, 0.2109375, 0.2109375, 0.2109375, 0.2109375, 0.2109375, 0.2109375, 0.2109375, 0.2109375, 0.2109375, 0.2109375, 0.2109375, 0.2425, 0.2425, 0.2425, 0.2425, 0.2425, 0.2425, 0.2425, 0.2425, 0.2425, 0.2425, 0.2425, 0.2425, 0.2425, 0.2740625, 0.2740625, 0.2740625, 0.2740625, 0.2740625, 0.2740625, 0.2740625, 0.2740625, 0.2740625, 0.2740625, 0.2740625, 0.2740625, 0.2740625, 0.305625, 0.305625, 0.305625, 0.305625, 0.305625, 0.305625, 0.305625, 0.305625, 0.305625, 0.305625, 0.305625, 0.305625, 0.305625, 0.3371875, 0.3371875, 0.3371875, 0.3371875, 0.3371875, 0.3371875, 0.3371875, 0.3371875, 0.3371875, 0.3371875, 0.3371875, 0.3371875, 0.3371875, 0.36875, 0.36875, 0.36875, 0.36875, 0.36875, 0.36875, 0.36875, 0.36875, 0.36875, 0.36875, 0.36875, 0.36875, 0.36875, 0.4003125, 0.4003125, 0.4003125, 0.4003125, 0.4003125, 0.4003125, 0.4003125, 0.4003125, 0.4003125, 0.4003125, 0.4003125, 0.4003125, 0.4003125, 0.431875, 0.431875, 0.431875, 0.431875, 0.431875, 0.431875, 0.431875, 0.431875, 0.431875, 0.431875, 0.431875, 0.431875, 0.431875, 0.4634375, 0.4634375, 0.4634375, 0.4634375, 0.4634375, 0.4634375, 0.4634375, 0.4634375, 0.4634375, 0.4634375, 0.4634375, 0.4634375, 0.4634375, 0.495, 0.495, 0.495, 0.495, 0.495, 0.495, 0.495, 0.495, 0.495, 0.495, 0.495, 0.495, 0.495, 0.5265625, 0.5265625, 0.5265625, 0.5265625, 0.5265625, 0.5265625, 0.5265625, 0.5265625, 0.5265625, 0.5265625, 0.5265625, 0.5265625, 0.5265625, 0.558125, 0.558125, 0.558125, 0.558125, 0.558125, 0.558125, 0.558125, 0.558125, 0.558125, 0.558125, 0.558125, 0.558125, 0.558125, 0.5896875, 0.5896875, 0.5896875, 0.5896875, 0.5896875, 0.5896875, 0.5896875, 0.5896875, 0.5896875, 0.5896875, 0.5896875, 0.5896875, 0.5896875, 0.62125, 0.62125, 0.62125, 0.62125, 0.62125, 0.62125, 0.62125, 0.62125, 0.62125, 0.62125, 0.62125, 0.62125, 0.62125, 0.625195313, 0.625195313, 0.625195313, 0.625195313, 0.625195313, 0.625195313, 0.625195313, 0.625195313, 0.625195313, 0.625195313, 0.625195313, 0.625195313, 0.625195313, 0.629140625, 0.629140625, 0.629140625, 0.629140625, 0.629140625, 0.629140625, 0.629140625, 0.629140625, 0.629140625, 0.629140625, 0.629140625, 0.629140625, 0.629140625, 0.63703125, 0.63703125, 0.63703125, 0.63703125, 0.63703125, 0.63703125, 0.63703125, 0.63703125, 0.63703125, 0.63703125, 0.63703125, 0.63703125, 0.63703125, 0.6528125, 0.6528125, 0.6528125, 0.6528125, 0.6528125, 0.6528125, 0.6528125, 0.6528125, 0.6528125, 0.6528125, 0.6528125, 0.6528125, 0.6528125, 0.684375, 0.684375, 0.684375, 0.684375, 0.684375, 0.684375, 0.684375, 0.684375, 0.684375, 0.684375, 0.684375, 0.684375, 0.684375, 0.7159375, 0.7159375, 0.7159375, 0.7159375, 0.7159375, 0.7159375, 0.7159375, 0.7159375, 0.7159375, 0.7159375, 0.7159375, 0.7159375, 0.7159375, 0.7475, 0.7475, 0.7475, 0.7475, 0.7475, 0.7475, 0.7475, 0.7475, 0.7475, 0.7475, 0.7475, 0.7475, 0.7475, 0.76328125, 0.76328125, 0.76328125, 0.76328125, 0.76328125, 0.76328125, 0.76328125, 0.76328125, 0.76328125, 0.76328125, 0.76328125, 0.76328125, 0.76328125, 0.7790625, 0.7790625, 0.7790625, 0.7790625, 0.7790625, 0.7790625, 0.7790625, 0.7790625, 0.7790625, 0.7790625, 0.7790625, 0.7790625, 0.7790625, 0.810625, 0.810625, 0.810625, 0.810625, 0.810625, 0.810625, 0.810625, 0.810625, 0.810625, 0.810625, 0.810625, 0.810625, 0.810625, 0.82640625, 0.82640625, 0.82640625, 0.82640625, 0.82640625, 0.82640625, 0.82640625, 0.82640625, 0.82640625, 0.82640625, 0.82640625, 0.82640625, 0.82640625, 0.8421875, 0.8421875, 0.8421875, 0.8421875, 0.8421875, 0.8421875, 0.8421875, 0.8421875, 0.8421875, 0.8421875, 0.8421875, 0.8421875, 0.8421875, 0.87375, 0.87375, 0.87375, 0.87375, 0.87375, 0.87375, 0.87375, 0.87375, 0.87375, 0.87375, 0.87375, 0.87375, 0.87375, 0.9053125, 0.9053125, 0.9053125, 0.9053125, 0.9053125, 0.9053125, 0.9053125, 0.9053125, 0.9053125, 0.9053125, 0.9053125, 0.9053125, 0.9053125, 0.936875, 0.936875, 0.936875, 0.936875, 0.936875, 0.936875, 0.936875, 0.936875, 0.936875, 0.936875, 0.936875, 0.936875, 0.936875, 1, 1, 1, 1, 1, 1, 1, 1, 1, 1, 1, 1, 1, 1, 1], degree=14))
            ThreePointArc((-6.379554183, 0.619822851), (-6.578477057, -1.52319194), (-8.441487365, -2.600816779))
        make_face()
        with BuildLine():
            add(Edge.make_bspline(
                [(-26.3254835, -3.667013126), (-25.88501641, -5.291831431), (-25.29377098, -6.855009859), (-23.845193985, -9.80629411), (-22.98792657, -11.194349378), (-21.051401006, -13.752352434), (-19.972214517, -14.922264044), (-17.642414844, -17.011136269), (-16.391877744, -17.930076055), (-13.774181132, -19.49521083), (-12.407098951, -20.141400668), (-9.613043017, -21.150681858), (-8.186144708, -21.513783431), (-5.328810088, -21.957896657), (-3.898444365, -22.038932986), (-1.087949282, -21.930758945), (0.292117033, -21.741586229), (2.952832896, -21.114730733), (4.233429246, -20.677096627), (6.652371052, -19.583645356), (7.790674993, -18.927885533), (9.889971566, -17.435500393), (10.850935673, -16.598938448), (12.56932106, -14.787435905), (13.326727542, -13.812561896), (14.621247223, -11.770130786), (15.158359498, -10.70264063), (16.00525724, -8.521867273), (16.315055224, -7.408648574), (16.709831654, -5.182520117), (16.79483508, -4.069669804), (16.751503646, -1.887722789), (16.623204755, -0.818678144), (16.172803424, 1.236551533), (15.85074605, 2.22269385), (15.039192621, 4.078780417), (14.549748502, 4.948692799), (13.435152517, 6.545872807), (12.810057002, 7.273120414), (11.459621106, 8.566197708), (10.73433891, 9.132019695), (8.46432492, 10.571334953), (6.826310345, 11.182779689), (3.596803483, 11.720427957), (2.006859472, 11.647480976), (-0.874358563, 10.942499326), (-2.164612563, 10.311829803), (-4.281093265, 8.698405735), (-5.106975392, 7.717261628), (-6.237076936, 5.644996058), (-6.54165034, 4.555429578), (-6.679047096, 2.494871997), (-6.512822326, 1.525102008), (-6.179406175, 0.700777066)],
                knots=[0, 0, 0, 0, 0.03125, 0.03125, 0.0625, 0.0625, 0.09375, 0.09375, 0.125, 0.125, 0.15625, 0.15625, 0.1875, 0.1875, 0.21875, 0.21875, 0.25, 0.25, 0.28125, 0.28125, 0.3125, 0.3125, 0.34375, 0.34375, 0.375, 0.375, 0.40625, 0.40625, 0.4375, 0.4375, 0.46875, 0.46875, 0.5, 0.5, 0.53125, 0.53125, 0.5625, 0.5625, 0.59375, 0.59375, 0.625, 0.625, 0.6875, 0.6875, 0.75, 0.75, 0.8125, 0.8125, 0.875, 0.875, 0.9375, 0.9375, 1, 1, 1, 1], degree=3))
            Line((-26.3254835, -3.667013126), (-8.431236894, -2.816473307))
            ThreePointArc((-8.431236894, -2.816473307), (-6.396649217, -1.639602622), (-6.179406175, 0.700777066))
        make_face(mode=Mode.SUBTRACT)
    # profile 2 of 2: a face of its own
    with BuildSketch(Plane.YZ):
        Circle(MOVE_FACE1_OUTLINE_R)
        Circle(MOVE_FACE1_OUTLINE_R_2, mode=Mode.SUBTRACT)
    extrude(amount=MOVE_FACE1_DEPTH)


solid = part.part
